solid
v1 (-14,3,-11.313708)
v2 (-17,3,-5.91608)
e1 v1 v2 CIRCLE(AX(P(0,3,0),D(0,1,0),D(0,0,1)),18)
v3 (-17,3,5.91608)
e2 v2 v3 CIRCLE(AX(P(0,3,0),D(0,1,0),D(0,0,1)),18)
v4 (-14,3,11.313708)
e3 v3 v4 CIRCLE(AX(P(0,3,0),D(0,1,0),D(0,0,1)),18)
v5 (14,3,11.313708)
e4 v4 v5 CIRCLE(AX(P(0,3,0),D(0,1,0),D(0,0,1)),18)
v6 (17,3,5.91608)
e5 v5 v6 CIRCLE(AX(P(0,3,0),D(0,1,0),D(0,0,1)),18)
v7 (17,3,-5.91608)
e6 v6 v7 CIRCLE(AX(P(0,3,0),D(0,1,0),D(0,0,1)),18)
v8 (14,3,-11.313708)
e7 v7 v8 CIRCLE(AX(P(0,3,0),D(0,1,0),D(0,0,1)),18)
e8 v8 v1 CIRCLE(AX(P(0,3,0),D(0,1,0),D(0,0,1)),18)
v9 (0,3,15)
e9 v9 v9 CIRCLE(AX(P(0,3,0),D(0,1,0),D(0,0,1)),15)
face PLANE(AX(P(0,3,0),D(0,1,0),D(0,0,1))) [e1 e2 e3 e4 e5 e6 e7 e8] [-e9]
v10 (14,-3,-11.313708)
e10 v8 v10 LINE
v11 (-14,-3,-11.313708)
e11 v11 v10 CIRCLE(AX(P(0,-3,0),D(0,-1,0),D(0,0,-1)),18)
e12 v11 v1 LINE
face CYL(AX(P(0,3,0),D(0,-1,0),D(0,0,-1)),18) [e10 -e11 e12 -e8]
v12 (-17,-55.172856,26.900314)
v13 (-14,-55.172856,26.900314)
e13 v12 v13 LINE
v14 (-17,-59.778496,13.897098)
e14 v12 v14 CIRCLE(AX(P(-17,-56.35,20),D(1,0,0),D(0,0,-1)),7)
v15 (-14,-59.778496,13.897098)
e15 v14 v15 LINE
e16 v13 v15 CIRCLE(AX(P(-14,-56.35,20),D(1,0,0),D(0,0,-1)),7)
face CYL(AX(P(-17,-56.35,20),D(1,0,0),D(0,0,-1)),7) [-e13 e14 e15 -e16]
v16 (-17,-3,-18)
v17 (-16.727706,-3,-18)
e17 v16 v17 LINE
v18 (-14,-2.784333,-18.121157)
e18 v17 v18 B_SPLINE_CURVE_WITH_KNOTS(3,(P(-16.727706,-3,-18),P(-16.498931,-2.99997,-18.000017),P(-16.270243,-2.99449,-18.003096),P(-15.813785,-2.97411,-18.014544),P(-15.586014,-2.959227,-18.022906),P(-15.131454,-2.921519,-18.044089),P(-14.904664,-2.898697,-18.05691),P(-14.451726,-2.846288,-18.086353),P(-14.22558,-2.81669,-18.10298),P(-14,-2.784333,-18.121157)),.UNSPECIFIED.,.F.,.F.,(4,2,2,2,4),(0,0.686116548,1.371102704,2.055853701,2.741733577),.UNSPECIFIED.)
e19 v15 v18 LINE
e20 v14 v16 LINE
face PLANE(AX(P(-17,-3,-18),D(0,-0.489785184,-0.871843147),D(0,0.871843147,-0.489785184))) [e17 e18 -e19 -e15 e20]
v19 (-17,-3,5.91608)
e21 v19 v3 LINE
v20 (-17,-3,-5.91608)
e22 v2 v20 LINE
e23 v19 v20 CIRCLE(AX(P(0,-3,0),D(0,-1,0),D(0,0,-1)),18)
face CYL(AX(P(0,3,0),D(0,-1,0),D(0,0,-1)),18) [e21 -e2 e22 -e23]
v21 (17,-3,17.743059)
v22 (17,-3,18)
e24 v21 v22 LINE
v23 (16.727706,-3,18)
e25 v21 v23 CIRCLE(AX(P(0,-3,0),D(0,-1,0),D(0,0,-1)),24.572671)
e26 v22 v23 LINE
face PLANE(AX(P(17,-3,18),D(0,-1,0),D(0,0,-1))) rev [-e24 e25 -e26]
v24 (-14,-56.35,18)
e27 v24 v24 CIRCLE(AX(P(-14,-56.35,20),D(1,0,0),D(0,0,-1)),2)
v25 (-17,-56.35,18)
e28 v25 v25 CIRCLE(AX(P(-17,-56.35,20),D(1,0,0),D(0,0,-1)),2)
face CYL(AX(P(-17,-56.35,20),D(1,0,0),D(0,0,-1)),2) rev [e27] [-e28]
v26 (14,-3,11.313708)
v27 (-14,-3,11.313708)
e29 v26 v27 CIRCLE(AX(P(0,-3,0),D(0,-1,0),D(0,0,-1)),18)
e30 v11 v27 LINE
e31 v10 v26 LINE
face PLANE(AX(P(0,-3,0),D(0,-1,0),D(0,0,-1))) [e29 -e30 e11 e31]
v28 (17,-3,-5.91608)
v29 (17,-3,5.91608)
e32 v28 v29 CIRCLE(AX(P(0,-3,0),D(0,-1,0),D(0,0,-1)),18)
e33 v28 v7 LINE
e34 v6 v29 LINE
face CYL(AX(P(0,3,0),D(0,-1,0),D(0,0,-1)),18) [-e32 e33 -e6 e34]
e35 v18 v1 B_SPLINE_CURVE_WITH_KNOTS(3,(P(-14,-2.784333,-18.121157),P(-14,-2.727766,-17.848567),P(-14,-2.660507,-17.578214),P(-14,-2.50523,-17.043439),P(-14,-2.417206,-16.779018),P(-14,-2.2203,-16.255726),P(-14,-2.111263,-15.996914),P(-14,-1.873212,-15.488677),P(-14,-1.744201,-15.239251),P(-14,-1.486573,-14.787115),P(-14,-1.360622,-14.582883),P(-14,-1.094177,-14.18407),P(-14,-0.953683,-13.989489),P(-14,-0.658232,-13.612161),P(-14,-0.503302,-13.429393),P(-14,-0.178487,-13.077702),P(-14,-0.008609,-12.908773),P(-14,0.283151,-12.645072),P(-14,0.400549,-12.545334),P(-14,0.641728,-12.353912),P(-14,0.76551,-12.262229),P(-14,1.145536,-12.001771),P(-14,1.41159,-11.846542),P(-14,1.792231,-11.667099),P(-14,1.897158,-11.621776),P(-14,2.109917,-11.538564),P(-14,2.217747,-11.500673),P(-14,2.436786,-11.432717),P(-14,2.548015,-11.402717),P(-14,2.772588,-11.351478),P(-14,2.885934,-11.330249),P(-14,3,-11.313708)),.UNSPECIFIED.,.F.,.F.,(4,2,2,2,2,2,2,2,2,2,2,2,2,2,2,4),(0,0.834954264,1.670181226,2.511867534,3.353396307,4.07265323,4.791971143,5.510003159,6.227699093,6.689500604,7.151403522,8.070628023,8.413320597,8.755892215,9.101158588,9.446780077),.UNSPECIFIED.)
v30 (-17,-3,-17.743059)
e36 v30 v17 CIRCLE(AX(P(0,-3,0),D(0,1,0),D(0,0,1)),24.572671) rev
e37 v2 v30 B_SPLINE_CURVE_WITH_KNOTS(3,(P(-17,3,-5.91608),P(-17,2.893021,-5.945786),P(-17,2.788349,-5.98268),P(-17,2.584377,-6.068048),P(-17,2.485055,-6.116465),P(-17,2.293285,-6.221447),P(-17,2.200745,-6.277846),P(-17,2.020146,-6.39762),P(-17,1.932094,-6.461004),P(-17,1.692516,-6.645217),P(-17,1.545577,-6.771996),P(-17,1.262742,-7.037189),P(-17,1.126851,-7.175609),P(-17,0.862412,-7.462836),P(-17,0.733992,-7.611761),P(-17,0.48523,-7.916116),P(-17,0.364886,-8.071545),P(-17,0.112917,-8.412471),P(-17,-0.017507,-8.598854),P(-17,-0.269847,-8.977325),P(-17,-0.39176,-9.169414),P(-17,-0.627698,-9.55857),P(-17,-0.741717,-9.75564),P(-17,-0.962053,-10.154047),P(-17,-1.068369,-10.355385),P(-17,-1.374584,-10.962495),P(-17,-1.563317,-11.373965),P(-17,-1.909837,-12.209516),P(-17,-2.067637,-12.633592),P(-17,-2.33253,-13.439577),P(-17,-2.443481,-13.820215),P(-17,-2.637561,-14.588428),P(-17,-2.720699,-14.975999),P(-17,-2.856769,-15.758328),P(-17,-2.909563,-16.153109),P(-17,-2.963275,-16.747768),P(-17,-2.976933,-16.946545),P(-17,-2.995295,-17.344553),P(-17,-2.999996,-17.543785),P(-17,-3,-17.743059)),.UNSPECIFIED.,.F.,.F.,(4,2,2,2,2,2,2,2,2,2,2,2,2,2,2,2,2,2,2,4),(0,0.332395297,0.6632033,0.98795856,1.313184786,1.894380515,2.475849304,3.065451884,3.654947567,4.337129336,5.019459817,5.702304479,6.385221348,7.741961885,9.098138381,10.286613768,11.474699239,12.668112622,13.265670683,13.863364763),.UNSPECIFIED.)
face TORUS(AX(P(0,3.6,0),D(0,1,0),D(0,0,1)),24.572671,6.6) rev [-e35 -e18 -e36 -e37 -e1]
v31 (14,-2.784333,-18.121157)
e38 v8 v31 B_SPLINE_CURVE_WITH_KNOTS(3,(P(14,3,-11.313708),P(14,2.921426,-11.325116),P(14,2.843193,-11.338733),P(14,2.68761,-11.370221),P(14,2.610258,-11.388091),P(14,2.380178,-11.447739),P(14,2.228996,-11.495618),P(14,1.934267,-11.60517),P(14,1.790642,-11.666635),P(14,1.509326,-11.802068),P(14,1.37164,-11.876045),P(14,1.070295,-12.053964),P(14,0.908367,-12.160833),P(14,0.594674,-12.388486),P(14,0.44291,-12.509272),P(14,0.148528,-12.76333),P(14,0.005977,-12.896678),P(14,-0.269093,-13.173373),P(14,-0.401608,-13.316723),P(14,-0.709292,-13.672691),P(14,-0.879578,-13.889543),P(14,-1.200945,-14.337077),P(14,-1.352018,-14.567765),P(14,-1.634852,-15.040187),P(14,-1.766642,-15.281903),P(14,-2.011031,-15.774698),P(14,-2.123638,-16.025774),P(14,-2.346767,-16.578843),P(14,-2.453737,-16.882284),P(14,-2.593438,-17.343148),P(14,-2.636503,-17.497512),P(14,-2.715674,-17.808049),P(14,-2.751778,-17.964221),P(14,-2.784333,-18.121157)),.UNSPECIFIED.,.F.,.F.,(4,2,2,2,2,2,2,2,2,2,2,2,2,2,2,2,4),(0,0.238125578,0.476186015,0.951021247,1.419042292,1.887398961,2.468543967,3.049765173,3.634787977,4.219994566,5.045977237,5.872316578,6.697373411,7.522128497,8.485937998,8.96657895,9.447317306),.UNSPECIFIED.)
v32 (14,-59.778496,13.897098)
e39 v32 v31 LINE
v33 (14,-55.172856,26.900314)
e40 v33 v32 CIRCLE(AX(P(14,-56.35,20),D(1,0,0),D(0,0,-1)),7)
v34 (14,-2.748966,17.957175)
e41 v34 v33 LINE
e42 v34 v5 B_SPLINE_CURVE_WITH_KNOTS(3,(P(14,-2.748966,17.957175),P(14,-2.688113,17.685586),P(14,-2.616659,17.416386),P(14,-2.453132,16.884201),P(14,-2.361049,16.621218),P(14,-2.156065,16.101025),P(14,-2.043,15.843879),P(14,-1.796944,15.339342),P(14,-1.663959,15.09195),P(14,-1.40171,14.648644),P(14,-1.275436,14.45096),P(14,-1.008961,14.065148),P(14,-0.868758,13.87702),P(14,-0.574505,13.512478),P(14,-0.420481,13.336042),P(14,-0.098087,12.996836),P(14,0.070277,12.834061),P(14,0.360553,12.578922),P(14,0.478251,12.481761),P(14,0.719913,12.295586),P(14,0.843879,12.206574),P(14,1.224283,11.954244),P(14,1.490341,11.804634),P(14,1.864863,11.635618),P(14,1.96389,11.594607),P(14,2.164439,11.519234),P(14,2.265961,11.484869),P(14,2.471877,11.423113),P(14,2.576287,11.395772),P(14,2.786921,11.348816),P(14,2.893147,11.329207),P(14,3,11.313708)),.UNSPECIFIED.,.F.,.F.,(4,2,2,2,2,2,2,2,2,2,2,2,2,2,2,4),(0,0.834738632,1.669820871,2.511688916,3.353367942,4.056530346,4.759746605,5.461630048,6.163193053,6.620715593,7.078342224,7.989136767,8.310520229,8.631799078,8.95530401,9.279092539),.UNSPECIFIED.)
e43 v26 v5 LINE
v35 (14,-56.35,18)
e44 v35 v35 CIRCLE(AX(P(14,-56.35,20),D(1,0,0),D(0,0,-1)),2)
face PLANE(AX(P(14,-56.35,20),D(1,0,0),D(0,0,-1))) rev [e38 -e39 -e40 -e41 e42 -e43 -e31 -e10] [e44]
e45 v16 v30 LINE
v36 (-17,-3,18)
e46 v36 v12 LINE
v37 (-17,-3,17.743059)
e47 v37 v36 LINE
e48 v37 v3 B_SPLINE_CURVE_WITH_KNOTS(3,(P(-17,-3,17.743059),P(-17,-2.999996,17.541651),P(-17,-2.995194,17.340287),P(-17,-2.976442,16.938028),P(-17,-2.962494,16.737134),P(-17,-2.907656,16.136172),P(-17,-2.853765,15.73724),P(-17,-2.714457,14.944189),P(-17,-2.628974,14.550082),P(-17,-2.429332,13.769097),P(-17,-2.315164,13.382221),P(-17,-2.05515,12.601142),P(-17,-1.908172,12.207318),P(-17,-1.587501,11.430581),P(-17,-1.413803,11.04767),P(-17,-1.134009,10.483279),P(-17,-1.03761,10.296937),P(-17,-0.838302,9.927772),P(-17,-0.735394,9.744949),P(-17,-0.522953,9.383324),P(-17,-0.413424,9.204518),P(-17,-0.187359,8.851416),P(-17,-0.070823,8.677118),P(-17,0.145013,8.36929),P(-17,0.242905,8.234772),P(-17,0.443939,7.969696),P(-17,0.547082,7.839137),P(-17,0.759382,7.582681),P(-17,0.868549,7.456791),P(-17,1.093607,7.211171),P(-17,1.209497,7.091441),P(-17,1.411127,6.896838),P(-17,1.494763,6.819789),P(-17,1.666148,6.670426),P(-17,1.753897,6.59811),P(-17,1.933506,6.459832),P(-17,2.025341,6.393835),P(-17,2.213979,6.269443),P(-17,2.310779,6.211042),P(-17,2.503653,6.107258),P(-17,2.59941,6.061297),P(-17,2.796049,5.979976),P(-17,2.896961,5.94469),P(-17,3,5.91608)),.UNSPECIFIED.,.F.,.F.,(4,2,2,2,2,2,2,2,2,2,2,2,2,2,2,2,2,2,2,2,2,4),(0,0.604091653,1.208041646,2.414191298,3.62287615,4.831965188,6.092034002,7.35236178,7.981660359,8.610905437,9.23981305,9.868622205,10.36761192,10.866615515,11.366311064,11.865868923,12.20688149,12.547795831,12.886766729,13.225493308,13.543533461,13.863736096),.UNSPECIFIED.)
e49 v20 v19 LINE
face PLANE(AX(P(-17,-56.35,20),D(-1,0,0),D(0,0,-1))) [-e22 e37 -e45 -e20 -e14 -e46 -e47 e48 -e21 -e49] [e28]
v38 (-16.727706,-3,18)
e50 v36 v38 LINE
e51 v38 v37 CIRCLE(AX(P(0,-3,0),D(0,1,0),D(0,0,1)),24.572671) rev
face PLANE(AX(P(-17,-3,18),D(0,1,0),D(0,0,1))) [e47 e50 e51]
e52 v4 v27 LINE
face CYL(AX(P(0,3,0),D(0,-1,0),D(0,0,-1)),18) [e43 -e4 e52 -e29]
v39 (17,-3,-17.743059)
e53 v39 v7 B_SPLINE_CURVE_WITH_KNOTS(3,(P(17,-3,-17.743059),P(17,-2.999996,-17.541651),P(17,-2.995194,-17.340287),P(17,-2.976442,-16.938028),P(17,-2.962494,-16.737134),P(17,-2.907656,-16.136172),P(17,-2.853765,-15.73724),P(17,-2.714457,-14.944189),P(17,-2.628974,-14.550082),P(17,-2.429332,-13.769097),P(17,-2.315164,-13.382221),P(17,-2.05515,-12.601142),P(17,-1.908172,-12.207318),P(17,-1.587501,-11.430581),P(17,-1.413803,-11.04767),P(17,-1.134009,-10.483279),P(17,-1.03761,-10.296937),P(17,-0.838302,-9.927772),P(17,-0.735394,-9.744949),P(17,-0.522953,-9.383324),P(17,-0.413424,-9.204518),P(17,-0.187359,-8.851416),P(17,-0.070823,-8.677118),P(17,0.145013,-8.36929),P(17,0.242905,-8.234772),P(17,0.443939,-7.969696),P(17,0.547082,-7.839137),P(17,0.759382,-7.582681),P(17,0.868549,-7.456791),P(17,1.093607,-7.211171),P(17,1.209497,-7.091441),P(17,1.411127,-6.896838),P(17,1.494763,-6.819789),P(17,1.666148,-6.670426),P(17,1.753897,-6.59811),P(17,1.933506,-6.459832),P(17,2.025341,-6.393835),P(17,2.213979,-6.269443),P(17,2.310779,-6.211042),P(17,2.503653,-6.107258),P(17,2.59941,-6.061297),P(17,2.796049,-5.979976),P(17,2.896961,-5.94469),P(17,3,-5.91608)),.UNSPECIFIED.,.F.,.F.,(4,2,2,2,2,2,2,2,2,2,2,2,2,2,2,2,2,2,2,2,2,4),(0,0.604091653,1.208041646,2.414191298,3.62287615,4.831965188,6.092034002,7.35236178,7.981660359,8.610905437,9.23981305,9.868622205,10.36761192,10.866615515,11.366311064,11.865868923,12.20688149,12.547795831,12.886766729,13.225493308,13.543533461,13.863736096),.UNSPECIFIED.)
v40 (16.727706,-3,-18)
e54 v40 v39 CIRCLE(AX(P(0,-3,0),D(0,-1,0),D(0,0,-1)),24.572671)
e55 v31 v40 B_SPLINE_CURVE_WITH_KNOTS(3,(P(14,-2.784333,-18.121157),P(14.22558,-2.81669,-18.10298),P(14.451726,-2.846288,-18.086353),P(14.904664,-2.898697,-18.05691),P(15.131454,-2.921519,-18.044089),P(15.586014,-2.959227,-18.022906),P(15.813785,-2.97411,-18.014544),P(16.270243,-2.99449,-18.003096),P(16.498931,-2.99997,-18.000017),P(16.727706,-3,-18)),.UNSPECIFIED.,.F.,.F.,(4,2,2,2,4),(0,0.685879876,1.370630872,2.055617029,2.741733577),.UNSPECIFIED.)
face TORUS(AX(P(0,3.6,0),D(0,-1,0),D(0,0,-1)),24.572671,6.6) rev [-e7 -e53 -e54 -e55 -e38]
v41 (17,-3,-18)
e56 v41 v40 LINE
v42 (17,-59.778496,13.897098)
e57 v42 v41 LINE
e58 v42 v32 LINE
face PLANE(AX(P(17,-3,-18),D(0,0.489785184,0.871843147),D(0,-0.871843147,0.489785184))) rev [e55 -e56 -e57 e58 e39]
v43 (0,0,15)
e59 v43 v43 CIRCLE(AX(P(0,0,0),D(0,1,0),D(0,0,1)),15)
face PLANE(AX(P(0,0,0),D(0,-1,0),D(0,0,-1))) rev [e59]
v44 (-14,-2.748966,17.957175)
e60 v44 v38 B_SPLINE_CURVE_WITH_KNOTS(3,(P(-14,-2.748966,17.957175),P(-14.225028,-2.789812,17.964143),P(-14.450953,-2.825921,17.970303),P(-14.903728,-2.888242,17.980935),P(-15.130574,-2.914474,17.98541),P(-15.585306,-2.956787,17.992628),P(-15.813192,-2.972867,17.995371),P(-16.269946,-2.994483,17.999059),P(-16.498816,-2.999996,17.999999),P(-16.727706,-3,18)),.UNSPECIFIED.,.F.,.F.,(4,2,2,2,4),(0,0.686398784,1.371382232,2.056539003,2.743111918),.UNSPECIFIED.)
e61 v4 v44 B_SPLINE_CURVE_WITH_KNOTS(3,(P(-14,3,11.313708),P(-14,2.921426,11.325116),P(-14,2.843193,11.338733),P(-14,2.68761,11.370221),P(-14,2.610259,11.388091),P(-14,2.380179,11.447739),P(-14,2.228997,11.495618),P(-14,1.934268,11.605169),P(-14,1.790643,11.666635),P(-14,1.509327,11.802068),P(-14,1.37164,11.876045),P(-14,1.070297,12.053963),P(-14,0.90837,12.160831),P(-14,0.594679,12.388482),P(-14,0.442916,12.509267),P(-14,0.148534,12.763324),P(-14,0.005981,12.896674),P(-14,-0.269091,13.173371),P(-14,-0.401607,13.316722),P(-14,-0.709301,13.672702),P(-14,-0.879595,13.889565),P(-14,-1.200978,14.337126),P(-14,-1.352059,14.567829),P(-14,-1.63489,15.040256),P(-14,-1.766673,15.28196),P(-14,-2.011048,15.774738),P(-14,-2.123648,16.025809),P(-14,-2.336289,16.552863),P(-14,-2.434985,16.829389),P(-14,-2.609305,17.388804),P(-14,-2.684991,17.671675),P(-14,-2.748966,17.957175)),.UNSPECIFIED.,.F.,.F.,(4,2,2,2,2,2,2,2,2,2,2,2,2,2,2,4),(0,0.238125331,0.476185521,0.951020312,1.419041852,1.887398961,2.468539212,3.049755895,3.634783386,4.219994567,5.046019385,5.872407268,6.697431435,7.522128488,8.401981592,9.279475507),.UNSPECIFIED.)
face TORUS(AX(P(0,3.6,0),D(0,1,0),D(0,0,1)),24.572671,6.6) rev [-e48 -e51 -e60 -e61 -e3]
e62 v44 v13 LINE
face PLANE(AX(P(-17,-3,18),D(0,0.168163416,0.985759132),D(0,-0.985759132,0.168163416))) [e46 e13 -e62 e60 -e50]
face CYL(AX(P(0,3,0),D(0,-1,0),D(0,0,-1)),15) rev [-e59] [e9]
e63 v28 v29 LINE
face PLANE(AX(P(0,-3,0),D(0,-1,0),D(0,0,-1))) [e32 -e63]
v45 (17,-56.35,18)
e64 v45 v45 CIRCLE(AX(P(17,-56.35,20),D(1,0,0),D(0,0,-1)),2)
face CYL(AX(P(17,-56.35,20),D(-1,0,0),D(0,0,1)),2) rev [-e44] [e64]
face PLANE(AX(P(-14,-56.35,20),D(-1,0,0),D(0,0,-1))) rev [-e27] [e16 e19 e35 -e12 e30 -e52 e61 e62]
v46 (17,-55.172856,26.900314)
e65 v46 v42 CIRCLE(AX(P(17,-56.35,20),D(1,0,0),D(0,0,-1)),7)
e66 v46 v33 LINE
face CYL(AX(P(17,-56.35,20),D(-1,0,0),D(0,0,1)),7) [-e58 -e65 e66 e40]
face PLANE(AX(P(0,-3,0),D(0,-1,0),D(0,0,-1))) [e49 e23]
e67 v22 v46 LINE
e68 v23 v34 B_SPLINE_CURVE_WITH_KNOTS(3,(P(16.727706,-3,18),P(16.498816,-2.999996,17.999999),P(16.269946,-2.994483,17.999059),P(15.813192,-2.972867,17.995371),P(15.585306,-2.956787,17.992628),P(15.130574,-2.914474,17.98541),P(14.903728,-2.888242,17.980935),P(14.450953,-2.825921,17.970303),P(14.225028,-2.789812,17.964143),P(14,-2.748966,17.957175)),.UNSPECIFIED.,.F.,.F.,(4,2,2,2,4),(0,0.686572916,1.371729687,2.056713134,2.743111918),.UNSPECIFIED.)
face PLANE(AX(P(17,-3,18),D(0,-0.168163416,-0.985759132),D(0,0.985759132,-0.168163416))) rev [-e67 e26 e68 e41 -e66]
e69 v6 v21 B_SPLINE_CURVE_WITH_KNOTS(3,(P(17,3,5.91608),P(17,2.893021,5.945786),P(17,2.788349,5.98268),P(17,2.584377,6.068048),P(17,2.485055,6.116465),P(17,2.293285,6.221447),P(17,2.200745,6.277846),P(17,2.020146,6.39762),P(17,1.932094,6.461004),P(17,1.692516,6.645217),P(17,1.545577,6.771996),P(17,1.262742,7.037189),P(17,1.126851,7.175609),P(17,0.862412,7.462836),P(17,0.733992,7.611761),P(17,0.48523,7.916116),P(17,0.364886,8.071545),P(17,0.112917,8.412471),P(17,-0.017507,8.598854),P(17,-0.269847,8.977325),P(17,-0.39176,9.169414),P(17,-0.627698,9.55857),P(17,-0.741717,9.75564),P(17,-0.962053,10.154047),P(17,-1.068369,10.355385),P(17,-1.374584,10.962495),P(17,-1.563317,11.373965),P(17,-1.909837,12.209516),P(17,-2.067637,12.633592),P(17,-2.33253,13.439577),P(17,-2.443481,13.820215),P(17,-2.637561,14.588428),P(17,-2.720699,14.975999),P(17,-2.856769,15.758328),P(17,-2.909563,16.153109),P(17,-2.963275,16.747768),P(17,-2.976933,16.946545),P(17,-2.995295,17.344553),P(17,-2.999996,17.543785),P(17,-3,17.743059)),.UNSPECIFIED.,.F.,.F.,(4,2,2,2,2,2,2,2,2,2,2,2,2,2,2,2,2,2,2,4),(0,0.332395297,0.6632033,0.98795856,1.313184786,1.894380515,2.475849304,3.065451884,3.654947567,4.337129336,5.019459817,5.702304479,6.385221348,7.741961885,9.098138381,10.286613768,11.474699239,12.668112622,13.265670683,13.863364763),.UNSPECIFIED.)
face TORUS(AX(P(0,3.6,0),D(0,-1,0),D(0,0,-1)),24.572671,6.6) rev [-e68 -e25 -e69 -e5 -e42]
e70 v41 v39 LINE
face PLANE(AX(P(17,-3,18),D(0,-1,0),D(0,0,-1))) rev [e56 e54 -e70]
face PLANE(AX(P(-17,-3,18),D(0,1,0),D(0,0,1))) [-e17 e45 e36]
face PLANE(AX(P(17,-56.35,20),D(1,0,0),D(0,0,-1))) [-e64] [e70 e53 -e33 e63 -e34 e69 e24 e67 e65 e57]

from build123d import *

# Parameters (mm, degrees)
ESQUISSE1_R        = 18
ESQUISSE1_R_2      = 15
BOSS_EXTRU_1_DEPTH = 3
BOSS_EXTRU_3_START = 3
ESQUISSE3_R        = 18
BOSS_EXTRU_3_DEPTH = 3
BOSS_EXTRU_2_START = 14
ESQUISSE2_R        = 2
BOSS_EXTRU_2_DEPTH = 3
FILLET1_R          = 6.6


with BuildPart() as part:
    # Esquisse1 → Boss.-Extru.1 (new body)
    with BuildSketch(Plane(origin=(0, 0, 0), x_dir=(1, 0, 0), z_dir=(0, 1, 0))):
        with Locations(Location((0, 0, 0), (0, 0, 270))):
            Circle(ESQUISSE1_R)
        with Locations(Location((0, 0, 0), (0, 0, 270))):
            Circle(ESQUISSE1_R_2, mode=Mode.SUBTRACT)
    extrude(amount=BOSS_EXTRU_1_DEPTH)

    # Esquisse3 → Boss.-Extru.3 (add)
    with BuildSketch(Plane.XZ.offset(BOSS_EXTRU_3_START)):
        with Locations(Location((0, 0, 0), (0, 0, 270))):
            Circle(ESQUISSE3_R)
    extrude(amount=-BOSS_EXTRU_3_DEPTH)

    # Esquisse2 → Boss.-Extru.2 (add)
    with BuildSketch(Plane(origin=(0, 0, 0), x_dir=(0, 0, -1), z_dir=(1, 0, 0)).offset(BOSS_EXTRU_2_START)):
        with BuildLine():
            Line((-18, -3), (-26.900313921, -55.172856085))
            ThreePointArc((-26.900313921, -55.172856085), (-22.337080841, -62.94833715), (-13.89709797, -59.778496291))
            Line((-13.89709797, -59.778496291), (18, -3))
            Line((18, -3), (-18, -3))
        make_face()
        with Locations((-20, -56.35)):
            Circle(ESQUISSE2_R, mode=Mode.SUBTRACT)
    boss_extru_2 = extrude(amount=BOSS_EXTRU_2_DEPTH)

    # Symétrie1: Boss.-Extru.2 across plane
    add(boss_extru_2.mirror(Plane(origin=(0, 0, 0), x_dir=(0, 0, 1), z_dir=(1, 0, 0))))

    # Fillet1
    # the kernel refuses this fillet: 6.6 mm, written as the material it adds along each edge
    with BuildSketch(Plane(origin=(0, -3, 0), x_dir=(-0.8375611584299304, 0, 0.5463435786110358), z_dir=(0.5463435786110358, 0, 0.8375611584299304))) as fillet1_piece_1_section:
        with BuildLine():
            CenterArc((24.57267069, -6.6), FILLET1_R, 90, 84.78409143)
            Line((24.57267069, 0), (18, 0))
            Line((18, 0), (18, -6))
        make_face()
    fillet1_piece_1 = revolve(axis=Axis((0, -3, 0), (0, -1, 0)), revolution_arc=124.363631706, mode=Mode.PRIVATE)
    fillet1_piece_1 = split(fillet1_piece_1, bisect_by=Plane(origin=(-14, -3, 0), z_dir=(-1, 0, 0)), keep=Keep.TOP, mode=Mode.PRIVATE)
    fillet1_piece_1 = split(fillet1_piece_1, bisect_by=Plane(origin=(-17, -3, 0), z_dir=(1, 0, 0)), keep=Keep.TOP, mode=Mode.PRIVATE)
    fillet1_piece_1 = split(fillet1_piece_1, bisect_by=Plane(origin=(0, -10.686285419, -13.681988516), z_dir=(0, 0.4897851844267101, 0.871843147083289)), keep=Keep.TOP, mode=Mode.PRIVATE)
    add(fillet1_piece_1)
    with BuildSketch(Plane(origin=(0, -3, 0), x_dir=(0.021764364768608612, 0, 0.999763128158975), z_dir=(0.999763128158975, 0, -0.021764364768608612))) as fillet1_piece_2_section:
        with BuildLine():
            CenterArc((24.57267069, -6.6), FILLET1_R, 90, 84.78409143)
            Line((24.57267069, 0), (18, 0))
            Line((18, 0), (18, -6))
        make_face()
    fillet1_piece_2 = revolve(axis=Axis((0, -3, 0), (0, -1, 0)), revolution_arc=124.363631706, mode=Mode.PRIVATE)
    fillet1_piece_2 = split(fillet1_piece_2, bisect_by=Plane(origin=(-14, -3, 0), z_dir=(-1, 0, 0)), keep=Keep.TOP, mode=Mode.PRIVATE)
    fillet1_piece_2 = split(fillet1_piece_2, bisect_by=Plane(origin=(0, -0.016164781, 17.490979177), z_dir=(0, -0.1681634163647939, -0.9857591315308831)), keep=Keep.TOP, mode=Mode.PRIVATE)
    fillet1_piece_2 = split(fillet1_piece_2, bisect_by=Plane(origin=(-17, -3, 0), z_dir=(1, 0, 0)), keep=Keep.TOP, mode=Mode.PRIVATE)
    add(fillet1_piece_2)
    with BuildSketch(Plane(origin=(0, -3, 0), x_dir=(-0.021764364768691844, 0, -0.9997631281589732), z_dir=(-0.9997631281589732, 0, 0.021764364768691844))) as fillet1_piece_3_section:
        with BuildLine():
            CenterArc((24.57267069, -6.6), FILLET1_R, 90, 84.78409143)
            Line((24.57267069, 0), (18, 0))
            Line((18, 0), (18, -6))
        make_face()
    fillet1_piece_3 = revolve(axis=Axis((0, -3, 0), (0, -1, 0)), revolution_arc=124.363631706, mode=Mode.PRIVATE)
    fillet1_piece_3 = split(fillet1_piece_3, bisect_by=Plane(origin=(14, -3, 0), z_dir=(1, 0, 0)), keep=Keep.TOP, mode=Mode.PRIVATE)
    fillet1_piece_3 = split(fillet1_piece_3, bisect_by=Plane(origin=(17, -3, 0), z_dir=(-1, 0, 0)), keep=Keep.TOP, mode=Mode.PRIVATE)
    fillet1_piece_3 = split(fillet1_piece_3, bisect_by=Plane(origin=(0, -10.686285419, -13.681988516), z_dir=(0, 0.4897851844267101, 0.871843147083289)), keep=Keep.TOP, mode=Mode.PRIVATE)
    add(fillet1_piece_3)
    with BuildSketch(Plane(origin=(0, -3, 0), x_dir=(0.8375611584299263, 0, -0.5463435786110422), z_dir=(-0.5463435786110422, 0, -0.8375611584299263))) as fillet1_piece_4_section:
        with BuildLine():
            CenterArc((24.57267069, -6.6), FILLET1_R, 90, 84.78409143)
            Line((24.57267069, 0), (18, 0))
            Line((18, 0), (18, -6))
        make_face()
    fillet1_piece_4 = revolve(axis=Axis((0, -3, 0), (0, -1, 0)), revolution_arc=124.363631706, mode=Mode.PRIVATE)
    fillet1_piece_4 = split(fillet1_piece_4, bisect_by=Plane(origin=(14, -3, 0), z_dir=(1, 0, 0)), keep=Keep.TOP, mode=Mode.PRIVATE)
    fillet1_piece_4 = split(fillet1_piece_4, bisect_by=Plane(origin=(17, -3, 0), z_dir=(-1, 0, 0)), keep=Keep.TOP, mode=Mode.PRIVATE)
    fillet1_piece_4 = split(fillet1_piece_4, bisect_by=Plane(origin=(0, -0.016164781, 17.490979177), z_dir=(0, -0.1681634163647939, -0.9857591315308831)), keep=Keep.TOP, mode=Mode.PRIVATE)
    add(fillet1_piece_4)


solid = part.part
